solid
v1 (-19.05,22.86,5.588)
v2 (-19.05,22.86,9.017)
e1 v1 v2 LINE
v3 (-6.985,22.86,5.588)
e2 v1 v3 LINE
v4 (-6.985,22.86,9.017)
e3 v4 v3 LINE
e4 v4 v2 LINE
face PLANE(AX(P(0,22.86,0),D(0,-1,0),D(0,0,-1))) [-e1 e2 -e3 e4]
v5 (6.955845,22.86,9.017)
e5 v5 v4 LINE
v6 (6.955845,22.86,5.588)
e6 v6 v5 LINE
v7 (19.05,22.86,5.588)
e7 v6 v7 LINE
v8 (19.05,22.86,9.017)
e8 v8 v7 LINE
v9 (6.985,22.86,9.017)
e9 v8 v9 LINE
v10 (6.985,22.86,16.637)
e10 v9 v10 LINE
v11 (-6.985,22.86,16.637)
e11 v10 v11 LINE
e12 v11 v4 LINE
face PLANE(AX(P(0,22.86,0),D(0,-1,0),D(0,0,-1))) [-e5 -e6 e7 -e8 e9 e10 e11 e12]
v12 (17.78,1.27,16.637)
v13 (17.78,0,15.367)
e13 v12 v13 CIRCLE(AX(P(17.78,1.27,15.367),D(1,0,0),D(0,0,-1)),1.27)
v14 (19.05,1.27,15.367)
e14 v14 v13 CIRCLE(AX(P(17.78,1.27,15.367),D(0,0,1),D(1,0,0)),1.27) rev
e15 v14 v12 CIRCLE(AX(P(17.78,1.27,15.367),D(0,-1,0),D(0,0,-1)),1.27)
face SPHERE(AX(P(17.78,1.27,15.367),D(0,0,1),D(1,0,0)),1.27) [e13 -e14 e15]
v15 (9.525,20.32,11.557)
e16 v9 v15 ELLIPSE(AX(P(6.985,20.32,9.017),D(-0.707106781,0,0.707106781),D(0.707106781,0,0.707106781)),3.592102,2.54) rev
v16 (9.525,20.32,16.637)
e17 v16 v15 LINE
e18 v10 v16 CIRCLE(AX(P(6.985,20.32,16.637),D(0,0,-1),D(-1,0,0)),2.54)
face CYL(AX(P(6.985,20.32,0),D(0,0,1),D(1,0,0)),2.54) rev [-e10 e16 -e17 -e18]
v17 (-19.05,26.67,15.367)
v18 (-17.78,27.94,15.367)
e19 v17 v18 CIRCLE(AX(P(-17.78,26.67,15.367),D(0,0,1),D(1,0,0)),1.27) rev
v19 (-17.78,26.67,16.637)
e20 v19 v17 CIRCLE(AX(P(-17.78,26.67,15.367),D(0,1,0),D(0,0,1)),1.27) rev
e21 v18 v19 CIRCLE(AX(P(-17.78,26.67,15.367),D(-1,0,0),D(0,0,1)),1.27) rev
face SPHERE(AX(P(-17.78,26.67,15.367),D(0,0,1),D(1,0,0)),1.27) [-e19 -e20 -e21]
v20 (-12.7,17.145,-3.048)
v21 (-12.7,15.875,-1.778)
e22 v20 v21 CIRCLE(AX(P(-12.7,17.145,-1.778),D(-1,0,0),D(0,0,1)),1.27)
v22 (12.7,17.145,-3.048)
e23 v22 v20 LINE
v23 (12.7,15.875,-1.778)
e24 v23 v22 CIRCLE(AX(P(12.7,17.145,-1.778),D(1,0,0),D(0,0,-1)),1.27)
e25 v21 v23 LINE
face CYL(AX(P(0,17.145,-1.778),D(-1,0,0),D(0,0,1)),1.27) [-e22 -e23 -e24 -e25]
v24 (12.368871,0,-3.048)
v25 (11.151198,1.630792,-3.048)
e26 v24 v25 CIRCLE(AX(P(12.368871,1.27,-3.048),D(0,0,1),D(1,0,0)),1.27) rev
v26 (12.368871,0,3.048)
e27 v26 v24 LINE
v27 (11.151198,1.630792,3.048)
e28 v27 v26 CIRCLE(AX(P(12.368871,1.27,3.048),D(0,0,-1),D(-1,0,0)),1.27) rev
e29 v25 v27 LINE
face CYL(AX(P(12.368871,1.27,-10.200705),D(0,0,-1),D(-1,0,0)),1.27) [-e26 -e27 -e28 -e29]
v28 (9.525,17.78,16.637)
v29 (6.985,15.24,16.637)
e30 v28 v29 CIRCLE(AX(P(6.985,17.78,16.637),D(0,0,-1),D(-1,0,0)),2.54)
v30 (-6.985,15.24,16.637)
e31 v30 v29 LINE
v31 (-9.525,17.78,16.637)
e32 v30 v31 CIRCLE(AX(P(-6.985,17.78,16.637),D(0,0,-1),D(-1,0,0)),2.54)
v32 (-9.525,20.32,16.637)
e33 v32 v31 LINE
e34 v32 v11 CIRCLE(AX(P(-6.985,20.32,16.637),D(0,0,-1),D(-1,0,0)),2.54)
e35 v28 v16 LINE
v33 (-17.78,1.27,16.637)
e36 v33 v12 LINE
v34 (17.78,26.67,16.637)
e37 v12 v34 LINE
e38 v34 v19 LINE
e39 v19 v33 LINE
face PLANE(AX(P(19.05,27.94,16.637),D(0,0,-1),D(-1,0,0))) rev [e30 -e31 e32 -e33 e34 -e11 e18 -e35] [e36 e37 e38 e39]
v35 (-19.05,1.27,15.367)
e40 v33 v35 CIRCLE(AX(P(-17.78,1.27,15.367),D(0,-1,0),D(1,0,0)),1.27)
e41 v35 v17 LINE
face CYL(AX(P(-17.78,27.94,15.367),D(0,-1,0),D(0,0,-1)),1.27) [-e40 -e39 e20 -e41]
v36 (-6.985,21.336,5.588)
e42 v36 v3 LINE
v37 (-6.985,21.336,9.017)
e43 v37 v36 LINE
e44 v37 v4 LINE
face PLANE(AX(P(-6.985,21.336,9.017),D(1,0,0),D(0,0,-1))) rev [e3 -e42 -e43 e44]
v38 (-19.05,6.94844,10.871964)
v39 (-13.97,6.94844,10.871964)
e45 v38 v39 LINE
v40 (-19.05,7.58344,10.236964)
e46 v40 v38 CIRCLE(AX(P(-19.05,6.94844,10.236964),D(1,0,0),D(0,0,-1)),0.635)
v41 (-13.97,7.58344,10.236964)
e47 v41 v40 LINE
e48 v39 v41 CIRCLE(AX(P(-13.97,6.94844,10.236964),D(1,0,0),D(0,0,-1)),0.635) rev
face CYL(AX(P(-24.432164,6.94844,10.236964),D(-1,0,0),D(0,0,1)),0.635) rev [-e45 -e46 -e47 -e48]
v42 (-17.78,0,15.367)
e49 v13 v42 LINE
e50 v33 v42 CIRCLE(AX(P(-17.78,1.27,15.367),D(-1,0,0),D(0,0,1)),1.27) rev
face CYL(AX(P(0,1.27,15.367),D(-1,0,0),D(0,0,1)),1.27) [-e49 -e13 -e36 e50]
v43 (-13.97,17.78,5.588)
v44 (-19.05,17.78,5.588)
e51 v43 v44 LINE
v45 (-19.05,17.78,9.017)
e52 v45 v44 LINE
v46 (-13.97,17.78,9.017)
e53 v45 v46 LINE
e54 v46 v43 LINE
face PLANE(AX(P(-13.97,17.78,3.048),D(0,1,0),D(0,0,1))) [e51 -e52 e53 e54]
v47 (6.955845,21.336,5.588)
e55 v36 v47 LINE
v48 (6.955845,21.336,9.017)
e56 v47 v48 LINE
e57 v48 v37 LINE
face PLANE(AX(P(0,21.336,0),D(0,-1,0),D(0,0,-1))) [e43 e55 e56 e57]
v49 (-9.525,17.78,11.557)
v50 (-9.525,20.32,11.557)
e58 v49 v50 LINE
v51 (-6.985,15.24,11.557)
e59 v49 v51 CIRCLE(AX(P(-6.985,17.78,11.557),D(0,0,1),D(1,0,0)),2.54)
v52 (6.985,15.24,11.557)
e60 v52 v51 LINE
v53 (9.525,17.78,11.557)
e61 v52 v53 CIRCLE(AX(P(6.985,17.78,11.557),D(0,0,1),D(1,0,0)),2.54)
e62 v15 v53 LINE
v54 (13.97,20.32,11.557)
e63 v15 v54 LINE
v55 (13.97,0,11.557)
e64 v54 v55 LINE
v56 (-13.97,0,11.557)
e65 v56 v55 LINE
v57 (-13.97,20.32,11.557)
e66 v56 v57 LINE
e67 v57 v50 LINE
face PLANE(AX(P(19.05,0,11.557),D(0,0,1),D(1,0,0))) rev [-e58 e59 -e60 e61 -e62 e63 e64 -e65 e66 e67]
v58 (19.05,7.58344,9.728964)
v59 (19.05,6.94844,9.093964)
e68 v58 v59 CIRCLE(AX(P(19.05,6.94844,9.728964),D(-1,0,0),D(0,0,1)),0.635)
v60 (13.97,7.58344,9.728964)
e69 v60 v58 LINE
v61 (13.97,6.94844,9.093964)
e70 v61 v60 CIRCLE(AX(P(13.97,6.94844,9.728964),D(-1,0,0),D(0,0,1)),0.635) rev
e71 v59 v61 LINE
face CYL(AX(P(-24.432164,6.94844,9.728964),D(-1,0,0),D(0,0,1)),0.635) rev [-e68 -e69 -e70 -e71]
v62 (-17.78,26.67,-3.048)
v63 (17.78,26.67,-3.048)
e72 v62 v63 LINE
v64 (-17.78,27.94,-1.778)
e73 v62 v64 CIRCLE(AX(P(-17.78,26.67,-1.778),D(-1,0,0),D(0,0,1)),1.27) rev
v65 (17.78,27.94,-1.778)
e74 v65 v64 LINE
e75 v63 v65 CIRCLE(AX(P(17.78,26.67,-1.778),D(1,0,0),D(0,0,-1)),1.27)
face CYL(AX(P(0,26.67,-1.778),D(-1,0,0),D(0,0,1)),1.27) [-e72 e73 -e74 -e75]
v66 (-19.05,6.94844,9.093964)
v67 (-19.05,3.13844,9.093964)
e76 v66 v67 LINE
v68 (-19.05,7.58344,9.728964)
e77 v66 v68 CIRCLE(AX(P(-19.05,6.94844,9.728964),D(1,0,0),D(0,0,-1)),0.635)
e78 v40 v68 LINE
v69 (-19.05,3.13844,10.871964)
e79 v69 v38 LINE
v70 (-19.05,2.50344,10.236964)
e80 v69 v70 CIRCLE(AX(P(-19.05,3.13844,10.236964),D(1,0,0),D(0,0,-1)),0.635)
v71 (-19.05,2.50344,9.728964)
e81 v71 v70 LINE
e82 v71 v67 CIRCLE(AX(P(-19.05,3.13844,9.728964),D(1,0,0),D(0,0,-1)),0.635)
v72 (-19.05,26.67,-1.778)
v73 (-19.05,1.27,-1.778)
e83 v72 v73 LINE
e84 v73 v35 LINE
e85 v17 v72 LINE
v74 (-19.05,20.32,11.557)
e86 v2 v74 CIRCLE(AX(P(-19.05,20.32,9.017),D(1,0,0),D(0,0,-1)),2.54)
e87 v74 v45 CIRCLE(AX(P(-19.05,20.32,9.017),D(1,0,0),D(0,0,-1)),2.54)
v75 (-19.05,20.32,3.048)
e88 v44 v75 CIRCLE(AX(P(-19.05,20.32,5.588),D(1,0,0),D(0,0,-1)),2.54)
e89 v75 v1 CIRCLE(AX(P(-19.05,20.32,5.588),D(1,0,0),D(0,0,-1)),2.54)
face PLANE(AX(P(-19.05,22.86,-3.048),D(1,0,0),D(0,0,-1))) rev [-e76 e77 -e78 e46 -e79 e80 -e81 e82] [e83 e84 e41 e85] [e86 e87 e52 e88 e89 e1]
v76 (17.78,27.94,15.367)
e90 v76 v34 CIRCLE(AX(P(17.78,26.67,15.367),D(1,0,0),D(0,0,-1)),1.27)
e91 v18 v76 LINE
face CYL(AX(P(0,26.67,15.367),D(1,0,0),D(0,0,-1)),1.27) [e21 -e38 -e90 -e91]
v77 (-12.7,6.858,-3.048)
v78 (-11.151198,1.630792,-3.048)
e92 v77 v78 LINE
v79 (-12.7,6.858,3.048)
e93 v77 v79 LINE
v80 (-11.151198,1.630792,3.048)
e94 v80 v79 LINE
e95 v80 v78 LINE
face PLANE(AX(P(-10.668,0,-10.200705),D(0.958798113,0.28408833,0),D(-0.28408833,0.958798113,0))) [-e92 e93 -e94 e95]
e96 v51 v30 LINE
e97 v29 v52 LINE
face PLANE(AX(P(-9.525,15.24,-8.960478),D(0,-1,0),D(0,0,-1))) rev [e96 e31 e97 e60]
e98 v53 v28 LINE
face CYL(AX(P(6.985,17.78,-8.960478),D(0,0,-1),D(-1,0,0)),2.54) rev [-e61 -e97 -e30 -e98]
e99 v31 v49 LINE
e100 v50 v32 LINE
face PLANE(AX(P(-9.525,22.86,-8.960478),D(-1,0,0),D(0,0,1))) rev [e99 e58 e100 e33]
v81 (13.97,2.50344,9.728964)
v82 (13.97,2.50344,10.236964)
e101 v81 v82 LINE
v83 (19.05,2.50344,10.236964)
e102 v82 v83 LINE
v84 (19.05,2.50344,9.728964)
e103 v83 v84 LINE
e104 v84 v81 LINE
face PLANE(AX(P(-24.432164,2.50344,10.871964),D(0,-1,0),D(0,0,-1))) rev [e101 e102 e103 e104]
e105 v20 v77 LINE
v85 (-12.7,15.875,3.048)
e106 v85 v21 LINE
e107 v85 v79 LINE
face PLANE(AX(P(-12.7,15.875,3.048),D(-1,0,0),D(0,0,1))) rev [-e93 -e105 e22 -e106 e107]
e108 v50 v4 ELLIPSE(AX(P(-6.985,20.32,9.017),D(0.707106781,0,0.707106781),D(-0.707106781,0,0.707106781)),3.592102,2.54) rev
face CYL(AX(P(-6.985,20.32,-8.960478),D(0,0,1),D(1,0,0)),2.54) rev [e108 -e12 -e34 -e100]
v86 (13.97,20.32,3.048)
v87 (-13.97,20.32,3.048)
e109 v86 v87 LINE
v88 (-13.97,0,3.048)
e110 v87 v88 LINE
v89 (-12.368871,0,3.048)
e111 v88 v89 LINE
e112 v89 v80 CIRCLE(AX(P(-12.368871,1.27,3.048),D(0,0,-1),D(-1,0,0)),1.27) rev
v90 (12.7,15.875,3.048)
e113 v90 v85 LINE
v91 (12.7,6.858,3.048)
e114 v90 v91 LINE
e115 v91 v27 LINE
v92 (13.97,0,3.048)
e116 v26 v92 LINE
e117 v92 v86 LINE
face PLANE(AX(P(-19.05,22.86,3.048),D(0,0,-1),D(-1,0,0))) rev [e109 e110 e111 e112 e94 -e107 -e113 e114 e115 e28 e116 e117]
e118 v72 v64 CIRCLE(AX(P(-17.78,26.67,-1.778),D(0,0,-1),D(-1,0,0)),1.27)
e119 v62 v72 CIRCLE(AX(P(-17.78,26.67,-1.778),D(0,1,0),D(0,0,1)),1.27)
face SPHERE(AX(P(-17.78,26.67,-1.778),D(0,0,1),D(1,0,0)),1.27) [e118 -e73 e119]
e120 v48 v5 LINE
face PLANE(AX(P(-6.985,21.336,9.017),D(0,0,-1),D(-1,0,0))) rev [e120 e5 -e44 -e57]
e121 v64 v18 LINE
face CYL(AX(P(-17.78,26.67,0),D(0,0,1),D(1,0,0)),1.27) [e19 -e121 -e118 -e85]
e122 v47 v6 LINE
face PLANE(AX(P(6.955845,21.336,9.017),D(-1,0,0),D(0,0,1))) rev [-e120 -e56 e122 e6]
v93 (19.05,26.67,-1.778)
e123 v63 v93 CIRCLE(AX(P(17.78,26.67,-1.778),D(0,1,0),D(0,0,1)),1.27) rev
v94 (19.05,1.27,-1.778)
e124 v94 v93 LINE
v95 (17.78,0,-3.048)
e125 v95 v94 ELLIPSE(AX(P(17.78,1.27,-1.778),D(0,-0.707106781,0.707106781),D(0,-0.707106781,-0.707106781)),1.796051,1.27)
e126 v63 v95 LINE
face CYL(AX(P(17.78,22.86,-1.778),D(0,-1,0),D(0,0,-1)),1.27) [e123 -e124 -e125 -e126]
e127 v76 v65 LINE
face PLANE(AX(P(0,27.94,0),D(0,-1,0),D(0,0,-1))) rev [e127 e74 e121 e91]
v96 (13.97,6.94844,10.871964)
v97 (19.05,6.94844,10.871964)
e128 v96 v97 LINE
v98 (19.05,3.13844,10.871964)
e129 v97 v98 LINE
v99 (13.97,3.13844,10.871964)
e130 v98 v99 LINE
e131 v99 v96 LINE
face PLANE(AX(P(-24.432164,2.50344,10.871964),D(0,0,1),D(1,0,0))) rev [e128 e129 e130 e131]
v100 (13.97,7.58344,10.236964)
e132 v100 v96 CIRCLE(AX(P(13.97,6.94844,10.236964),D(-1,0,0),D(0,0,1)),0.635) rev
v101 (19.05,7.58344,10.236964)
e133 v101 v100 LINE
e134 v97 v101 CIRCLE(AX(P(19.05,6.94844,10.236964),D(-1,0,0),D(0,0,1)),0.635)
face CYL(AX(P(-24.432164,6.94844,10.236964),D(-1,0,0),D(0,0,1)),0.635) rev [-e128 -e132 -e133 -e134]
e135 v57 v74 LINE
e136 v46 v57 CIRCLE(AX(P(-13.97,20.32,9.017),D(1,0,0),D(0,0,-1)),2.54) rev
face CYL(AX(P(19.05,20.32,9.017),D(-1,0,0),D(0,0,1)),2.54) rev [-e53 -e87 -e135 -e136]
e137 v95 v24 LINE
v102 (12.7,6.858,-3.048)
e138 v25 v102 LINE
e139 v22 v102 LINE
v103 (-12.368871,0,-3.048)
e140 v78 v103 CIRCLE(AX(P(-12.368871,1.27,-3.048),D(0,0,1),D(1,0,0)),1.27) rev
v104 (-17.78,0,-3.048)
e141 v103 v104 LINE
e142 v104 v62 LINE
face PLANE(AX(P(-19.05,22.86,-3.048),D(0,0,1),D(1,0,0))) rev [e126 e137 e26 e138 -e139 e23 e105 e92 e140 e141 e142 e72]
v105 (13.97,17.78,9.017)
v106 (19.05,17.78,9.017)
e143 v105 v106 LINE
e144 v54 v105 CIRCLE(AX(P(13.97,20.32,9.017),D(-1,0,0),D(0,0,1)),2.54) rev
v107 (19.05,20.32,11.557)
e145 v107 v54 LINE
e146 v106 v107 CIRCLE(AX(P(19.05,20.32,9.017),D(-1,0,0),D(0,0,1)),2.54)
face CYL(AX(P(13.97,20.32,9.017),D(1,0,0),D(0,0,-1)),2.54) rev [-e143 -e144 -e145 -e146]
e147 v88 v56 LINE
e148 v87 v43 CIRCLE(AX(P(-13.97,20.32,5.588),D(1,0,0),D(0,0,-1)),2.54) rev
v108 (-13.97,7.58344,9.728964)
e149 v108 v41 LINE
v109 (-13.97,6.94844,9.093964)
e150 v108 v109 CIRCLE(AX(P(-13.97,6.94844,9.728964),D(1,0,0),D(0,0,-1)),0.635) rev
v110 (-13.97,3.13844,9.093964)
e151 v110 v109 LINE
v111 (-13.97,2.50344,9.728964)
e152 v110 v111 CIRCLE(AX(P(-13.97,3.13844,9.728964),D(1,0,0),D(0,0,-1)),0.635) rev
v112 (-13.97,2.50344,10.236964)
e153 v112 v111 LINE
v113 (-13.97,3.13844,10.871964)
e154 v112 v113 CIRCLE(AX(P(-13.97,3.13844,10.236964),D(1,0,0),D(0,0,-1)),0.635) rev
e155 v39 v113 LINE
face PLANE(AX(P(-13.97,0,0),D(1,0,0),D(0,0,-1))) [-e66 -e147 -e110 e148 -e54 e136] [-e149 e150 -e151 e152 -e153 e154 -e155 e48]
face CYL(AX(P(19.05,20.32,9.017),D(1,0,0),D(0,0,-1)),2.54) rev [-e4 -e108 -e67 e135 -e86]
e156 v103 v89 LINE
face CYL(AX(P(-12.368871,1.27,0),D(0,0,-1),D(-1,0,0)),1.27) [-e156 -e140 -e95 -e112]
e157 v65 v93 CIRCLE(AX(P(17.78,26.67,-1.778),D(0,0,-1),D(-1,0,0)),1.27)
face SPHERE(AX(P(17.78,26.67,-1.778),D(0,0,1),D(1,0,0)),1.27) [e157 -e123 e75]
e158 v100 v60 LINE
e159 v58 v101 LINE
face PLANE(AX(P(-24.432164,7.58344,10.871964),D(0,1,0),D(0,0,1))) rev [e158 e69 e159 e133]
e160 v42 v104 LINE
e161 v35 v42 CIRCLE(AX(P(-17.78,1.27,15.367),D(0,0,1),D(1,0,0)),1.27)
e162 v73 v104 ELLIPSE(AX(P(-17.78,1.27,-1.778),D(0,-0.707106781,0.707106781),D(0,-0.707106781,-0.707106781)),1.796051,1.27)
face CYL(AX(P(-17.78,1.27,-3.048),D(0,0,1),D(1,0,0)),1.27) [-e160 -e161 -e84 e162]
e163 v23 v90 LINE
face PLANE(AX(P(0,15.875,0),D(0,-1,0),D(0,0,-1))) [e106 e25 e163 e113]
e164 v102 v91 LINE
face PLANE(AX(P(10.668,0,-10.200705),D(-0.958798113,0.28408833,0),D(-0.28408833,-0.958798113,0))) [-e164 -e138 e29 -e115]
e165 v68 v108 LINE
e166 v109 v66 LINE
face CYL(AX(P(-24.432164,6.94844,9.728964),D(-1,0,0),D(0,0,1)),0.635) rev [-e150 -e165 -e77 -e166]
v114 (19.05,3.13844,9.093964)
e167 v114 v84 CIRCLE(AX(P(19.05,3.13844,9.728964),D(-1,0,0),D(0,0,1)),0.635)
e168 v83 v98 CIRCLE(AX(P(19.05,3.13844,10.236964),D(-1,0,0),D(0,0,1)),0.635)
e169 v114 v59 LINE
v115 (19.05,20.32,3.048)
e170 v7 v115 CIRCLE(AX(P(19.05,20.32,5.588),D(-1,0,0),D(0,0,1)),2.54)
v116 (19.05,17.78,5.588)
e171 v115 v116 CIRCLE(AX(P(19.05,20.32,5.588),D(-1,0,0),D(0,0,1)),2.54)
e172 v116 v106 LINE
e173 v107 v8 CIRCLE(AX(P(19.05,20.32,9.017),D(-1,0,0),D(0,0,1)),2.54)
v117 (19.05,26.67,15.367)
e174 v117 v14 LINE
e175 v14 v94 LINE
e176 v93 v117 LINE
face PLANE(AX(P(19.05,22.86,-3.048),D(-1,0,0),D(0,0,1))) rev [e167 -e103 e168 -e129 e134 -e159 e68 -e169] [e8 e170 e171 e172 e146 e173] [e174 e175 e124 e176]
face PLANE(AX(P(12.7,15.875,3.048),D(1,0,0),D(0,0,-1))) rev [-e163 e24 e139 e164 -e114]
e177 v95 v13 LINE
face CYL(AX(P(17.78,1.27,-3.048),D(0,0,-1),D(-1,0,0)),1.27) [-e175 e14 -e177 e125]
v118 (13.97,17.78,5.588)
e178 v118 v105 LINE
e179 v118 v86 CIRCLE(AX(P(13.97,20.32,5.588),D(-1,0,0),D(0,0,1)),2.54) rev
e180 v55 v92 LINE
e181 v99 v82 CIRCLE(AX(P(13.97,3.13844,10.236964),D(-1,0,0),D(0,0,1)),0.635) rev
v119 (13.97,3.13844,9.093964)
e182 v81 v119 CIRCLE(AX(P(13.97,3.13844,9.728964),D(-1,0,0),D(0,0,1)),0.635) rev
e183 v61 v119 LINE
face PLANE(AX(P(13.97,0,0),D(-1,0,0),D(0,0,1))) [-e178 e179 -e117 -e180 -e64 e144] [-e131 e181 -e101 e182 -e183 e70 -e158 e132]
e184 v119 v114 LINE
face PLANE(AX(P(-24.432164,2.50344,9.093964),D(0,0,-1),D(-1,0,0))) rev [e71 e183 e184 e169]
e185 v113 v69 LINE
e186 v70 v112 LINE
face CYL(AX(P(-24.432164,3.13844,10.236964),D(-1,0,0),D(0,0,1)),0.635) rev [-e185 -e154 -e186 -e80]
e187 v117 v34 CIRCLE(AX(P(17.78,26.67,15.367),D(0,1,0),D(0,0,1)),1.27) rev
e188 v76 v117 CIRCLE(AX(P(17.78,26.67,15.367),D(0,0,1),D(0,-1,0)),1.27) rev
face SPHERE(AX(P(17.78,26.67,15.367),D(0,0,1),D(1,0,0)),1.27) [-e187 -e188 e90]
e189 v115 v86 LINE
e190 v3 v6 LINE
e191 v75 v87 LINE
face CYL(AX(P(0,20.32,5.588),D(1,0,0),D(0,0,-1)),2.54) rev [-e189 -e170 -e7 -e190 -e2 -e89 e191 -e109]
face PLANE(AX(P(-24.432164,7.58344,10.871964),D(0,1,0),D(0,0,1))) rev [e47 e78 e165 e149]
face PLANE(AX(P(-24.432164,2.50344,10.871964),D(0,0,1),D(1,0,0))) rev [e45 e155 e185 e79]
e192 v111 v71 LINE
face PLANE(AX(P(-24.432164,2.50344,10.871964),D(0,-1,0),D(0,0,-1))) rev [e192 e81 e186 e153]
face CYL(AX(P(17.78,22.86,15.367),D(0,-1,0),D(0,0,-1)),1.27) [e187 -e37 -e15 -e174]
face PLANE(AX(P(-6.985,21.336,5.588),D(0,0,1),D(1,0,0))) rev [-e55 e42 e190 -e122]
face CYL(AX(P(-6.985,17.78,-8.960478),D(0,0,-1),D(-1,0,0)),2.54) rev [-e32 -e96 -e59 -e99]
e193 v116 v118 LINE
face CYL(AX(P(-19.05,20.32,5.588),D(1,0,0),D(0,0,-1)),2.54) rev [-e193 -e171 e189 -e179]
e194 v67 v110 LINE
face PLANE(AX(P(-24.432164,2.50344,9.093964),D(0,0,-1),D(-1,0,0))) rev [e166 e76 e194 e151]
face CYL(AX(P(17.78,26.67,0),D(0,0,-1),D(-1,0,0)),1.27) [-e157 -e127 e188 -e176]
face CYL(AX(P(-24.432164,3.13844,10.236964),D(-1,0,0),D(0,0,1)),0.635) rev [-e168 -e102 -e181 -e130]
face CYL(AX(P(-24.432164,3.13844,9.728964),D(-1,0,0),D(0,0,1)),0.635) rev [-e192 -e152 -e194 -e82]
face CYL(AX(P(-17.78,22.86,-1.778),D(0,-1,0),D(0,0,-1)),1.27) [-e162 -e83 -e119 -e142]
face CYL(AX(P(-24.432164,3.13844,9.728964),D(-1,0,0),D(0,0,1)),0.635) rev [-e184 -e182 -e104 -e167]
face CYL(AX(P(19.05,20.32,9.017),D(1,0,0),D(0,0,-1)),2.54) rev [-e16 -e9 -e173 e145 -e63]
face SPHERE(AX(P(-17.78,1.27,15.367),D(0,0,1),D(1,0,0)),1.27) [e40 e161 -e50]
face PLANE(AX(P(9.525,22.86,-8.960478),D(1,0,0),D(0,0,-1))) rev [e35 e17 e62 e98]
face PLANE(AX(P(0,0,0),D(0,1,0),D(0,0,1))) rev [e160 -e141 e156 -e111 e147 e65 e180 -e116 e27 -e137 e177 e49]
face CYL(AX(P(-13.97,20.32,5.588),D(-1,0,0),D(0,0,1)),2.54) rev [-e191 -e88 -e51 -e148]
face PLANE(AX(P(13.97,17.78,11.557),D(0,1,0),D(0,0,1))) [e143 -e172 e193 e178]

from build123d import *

# Parameters (mm, degrees)
SKETCH1_W           = 38.1
SKETCH1_H           = 6.096
BOSS_EXTRUDE1_DEPTH = 22.86
SKETCH4_W           = 25.4
SKETCH4_H           = 6.096
CUT_EXTRUDE1_DEPTH  = 15.875
FILLET1_R           = 1.27
SKETCH5_W           = 38.1
SKETCH5_H           = 19.685
BOSS_EXTRUDE2_DEPTH = 5.08
BOSS_EXTRUDE3_DEPTH = 6.096
BOSS_EXTRUDE4_DEPTH = 6.096
FILLET2_R           = 1.27
SKETCH9_W           = 38.1
SKETCH9_H           = 5.08
BOSS_EXTRUDE5_DEPTH = 22.86
SKETCH10_W          = 8.509
SKETCH10_H          = 17.78
BOSS_EXTRUDE6_DEPTH = 5.08
SKETCH11_W          = 8.509
SKETCH11_H          = 17.78
BOSS_EXTRUDE7_DEPTH = 5.08
SKETCH12_W          = 19.05
SKETCH12_H          = 7.62
CUT_EXTRUDE2_DEPTH  = 5.08
FILLET3_R           = 2.54
FILLET5_R           = 2.54
FILLET6_R           = 1.27
SKETCH13_W          = 13.940844751
SKETCH13_H          = 3.429
BOSS_EXTRUDE8_DEPTH = 1.524
CUT_EXTRUDE5_REACH  = 52.09
SKETCH22_W          = 1.778
SKETCH22_H          = 5.08
FILLET7_R           = 0.635


with BuildPart() as part:
    # Sketch1 → Boss-Extrude1 (new body)
    with BuildSketch(Plane(origin=(0, 0, 0), x_dir=(1, 0, 0), z_dir=(0, 1, 0))):
        Rectangle(SKETCH1_W, SKETCH1_H)
    extrude(amount=BOSS_EXTRUDE1_DEPTH)

    # Sketch4 → Cut-Extrude1 (cut)
    with BuildSketch(Plane.XZ):
        Rectangle(SKETCH4_W, SKETCH4_H)
    extrude(amount=-CUT_EXTRUDE1_DEPTH, mode=Mode.SUBTRACT)

    # Fillet1
    fillet1_edges = [part.edges().sort_by_distance(p)[0] for p in [
        (0, 15.875, -3.048),
    ]]
    fillet(fillet1_edges, radius=FILLET1_R)

    # Sketch5 → Boss-Extrude2 (add)
    with BuildSketch(Plane(origin=(0, 22.86, 0), x_dir=(1, 0, 0), z_dir=(0, 1, 0))):
        with Locations((0, -6.7945)):
            Rectangle(SKETCH5_W, SKETCH5_H)
    extrude(amount=BOSS_EXTRUDE2_DEPTH)

    # Sketch6 → Boss-Extrude3 (add)
    with BuildSketch(Plane.XY.offset(3.048)):
        Polygon((-12.7, 0), (-10.668, 0), (-12.7, 6.858), align=None)
    extrude(amount=-BOSS_EXTRUDE3_DEPTH)

    # Sketch7 → Boss-Extrude4 (add)
    with BuildSketch(Plane.XY.offset(3.048)):
        Polygon((12.7, 0), (10.668, 0), (12.7, 6.858), align=None)
    extrude(amount=-BOSS_EXTRUDE4_DEPTH)

    # Fillet2
    fillet2_edges = [part.edges().sort_by_distance(p)[0] for p in [
        (-10.668, 0, 0),
        (10.668, 0, 0),
    ]]
    fillet(fillet2_edges, radius=FILLET2_R)

    # Sketch9 → Boss-Extrude5 (add)
    with BuildSketch(Plane.XZ.offset(-22.86)):
        with Locations((0, 14.097)):
            Rectangle(SKETCH9_W, SKETCH9_H)
    extrude(amount=BOSS_EXTRUDE5_DEPTH)

    # Sketch10 → Boss-Extrude6 (add)
    with BuildSketch(Plane(origin=(19.05, 0, 0), x_dir=(0, 0, -1), z_dir=(1, 0, 0))):
        with Locations((-7.3025, 8.89)):
            Rectangle(SKETCH10_W, SKETCH10_H)
    extrude(amount=-BOSS_EXTRUDE6_DEPTH)

    # Sketch11 → Boss-Extrude7 (add)
    with BuildSketch(Plane.ZY.offset(19.05)):
        with Locations((7.3025, 8.89)):
            Rectangle(SKETCH11_W, SKETCH11_H)
    extrude(amount=-BOSS_EXTRUDE7_DEPTH)

    # Sketch12 → Cut-Extrude2 (cut)
    with BuildSketch(Plane.XY.offset(16.637)):
        with Locations((0, 19.05)):
            Rectangle(SKETCH12_W, SKETCH12_H)
    extrude(amount=-CUT_EXTRUDE2_DEPTH, mode=Mode.SUBTRACT)

    # Fillet3
    fillet3_edges = [part.edges().sort_by_distance(p)[0] for p in [
        (9.525, 22.86, 14.097),
        (9.525, 15.24, 14.097),
        (-9.525, 15.24, 14.097),
        (-9.525, 22.86, 14.097),
    ]]
    fillet(fillet3_edges, radius=FILLET3_R)

    # Fillet5
    fillet5_edges = [part.edges().sort_by_distance(p)[0] for p in [
        (13.0175, 22.86, 11.557),
        (16.51, 17.78, 11.557),
        (16.51, 17.78, 3.048),
        (0, 22.86, 3.048),
        (-13.0175, 22.86, 11.557),
        (-16.51, 17.78, 11.557),
        (-16.51, 17.78, 3.048),
    ]]
    fillet(fillet5_edges, radius=FILLET5_R - 0.0001)  # a hair under: the kernel refuses the full size

    # Fillet6
    fillet6_edges = [part.edges().sort_by_distance(p)[0] for p in [
        (19.05, 13.97, 16.637),
        (-19.05, 13.97, 16.637),
        (19.05, 27.94, 6.7945),
        (0, 27.94, -3.048),
        (-19.05, 27.94, 6.7945),
        (0, 27.94, 16.637),
        (-19.05, 0, 6.7945),
        (19.05, 0, 6.7945),
        (-19.05, 13.97, -3.048),
        (19.05, 13.97, -3.048),
        (0, 0, 16.637),
    ]]
    fillet(fillet6_edges, radius=FILLET6_R)

    # Sketch13 → Boss-Extrude8 (add)
    with BuildSketch(Plane.XZ.offset(-22.86)):
        with Locations((-0.014577624, 7.3025)):
            Rectangle(SKETCH13_W, SKETCH13_H)
    extrude(amount=BOSS_EXTRUDE8_DEPTH)

    # Cut-Extrude5: up to this face of the body (flat: up to its plane)
    cut_extrude5_end = Plane(part.part.faces().sort_by_distance((-19.05, 13.368385641, 6.746370851))[0])
    # Sketch22 → Cut-Extrude5 (cut, up to the picked face)
    with BuildSketch(Plane(origin=(19.05, 0, 0), x_dir=(0, 0, -1), z_dir=(1, 0, 0)), mode=Mode.PRIVATE) as cut_extrude5_sk1:
        with Locations((-9.982963742, 5.043439789)):
            Rectangle(SKETCH22_W, SKETCH22_H)
    cut_extrude5_tool1 = split(extrude(cut_extrude5_sk1.sketch, amount=-CUT_EXTRUDE5_REACH, mode=Mode.PRIVATE), bisect_by=cut_extrude5_end, keep=Keep.BOTH, mode=Mode.PRIVATE)
    add(cut_extrude5_tool1.solids().sort_by(Axis((19.05, 5.04344, 9.982964), (-1, 0, 0)))[0], mode=Mode.SUBTRACT)

    # Fillet7
    fillet7_edges = [part.edges().sort_by_distance(p)[0] for p in [
        (16.51, 2.503439789, 10.871963742),
        (16.51, 7.583439789, 10.871963742),
        (16.51, 7.583439789, 9.093963742),
        (16.51, 2.503439789, 9.093963742),
        (-16.51, 2.503439789, 10.871963742),
        (-16.51, 7.583439789, 10.871963742),
        (-16.51, 7.583439789, 9.093963742),
        (-16.51, 2.503439789, 9.093963742),
    ]]
    fillet(fillet7_edges, radius=FILLET7_R)


solid = part.part
